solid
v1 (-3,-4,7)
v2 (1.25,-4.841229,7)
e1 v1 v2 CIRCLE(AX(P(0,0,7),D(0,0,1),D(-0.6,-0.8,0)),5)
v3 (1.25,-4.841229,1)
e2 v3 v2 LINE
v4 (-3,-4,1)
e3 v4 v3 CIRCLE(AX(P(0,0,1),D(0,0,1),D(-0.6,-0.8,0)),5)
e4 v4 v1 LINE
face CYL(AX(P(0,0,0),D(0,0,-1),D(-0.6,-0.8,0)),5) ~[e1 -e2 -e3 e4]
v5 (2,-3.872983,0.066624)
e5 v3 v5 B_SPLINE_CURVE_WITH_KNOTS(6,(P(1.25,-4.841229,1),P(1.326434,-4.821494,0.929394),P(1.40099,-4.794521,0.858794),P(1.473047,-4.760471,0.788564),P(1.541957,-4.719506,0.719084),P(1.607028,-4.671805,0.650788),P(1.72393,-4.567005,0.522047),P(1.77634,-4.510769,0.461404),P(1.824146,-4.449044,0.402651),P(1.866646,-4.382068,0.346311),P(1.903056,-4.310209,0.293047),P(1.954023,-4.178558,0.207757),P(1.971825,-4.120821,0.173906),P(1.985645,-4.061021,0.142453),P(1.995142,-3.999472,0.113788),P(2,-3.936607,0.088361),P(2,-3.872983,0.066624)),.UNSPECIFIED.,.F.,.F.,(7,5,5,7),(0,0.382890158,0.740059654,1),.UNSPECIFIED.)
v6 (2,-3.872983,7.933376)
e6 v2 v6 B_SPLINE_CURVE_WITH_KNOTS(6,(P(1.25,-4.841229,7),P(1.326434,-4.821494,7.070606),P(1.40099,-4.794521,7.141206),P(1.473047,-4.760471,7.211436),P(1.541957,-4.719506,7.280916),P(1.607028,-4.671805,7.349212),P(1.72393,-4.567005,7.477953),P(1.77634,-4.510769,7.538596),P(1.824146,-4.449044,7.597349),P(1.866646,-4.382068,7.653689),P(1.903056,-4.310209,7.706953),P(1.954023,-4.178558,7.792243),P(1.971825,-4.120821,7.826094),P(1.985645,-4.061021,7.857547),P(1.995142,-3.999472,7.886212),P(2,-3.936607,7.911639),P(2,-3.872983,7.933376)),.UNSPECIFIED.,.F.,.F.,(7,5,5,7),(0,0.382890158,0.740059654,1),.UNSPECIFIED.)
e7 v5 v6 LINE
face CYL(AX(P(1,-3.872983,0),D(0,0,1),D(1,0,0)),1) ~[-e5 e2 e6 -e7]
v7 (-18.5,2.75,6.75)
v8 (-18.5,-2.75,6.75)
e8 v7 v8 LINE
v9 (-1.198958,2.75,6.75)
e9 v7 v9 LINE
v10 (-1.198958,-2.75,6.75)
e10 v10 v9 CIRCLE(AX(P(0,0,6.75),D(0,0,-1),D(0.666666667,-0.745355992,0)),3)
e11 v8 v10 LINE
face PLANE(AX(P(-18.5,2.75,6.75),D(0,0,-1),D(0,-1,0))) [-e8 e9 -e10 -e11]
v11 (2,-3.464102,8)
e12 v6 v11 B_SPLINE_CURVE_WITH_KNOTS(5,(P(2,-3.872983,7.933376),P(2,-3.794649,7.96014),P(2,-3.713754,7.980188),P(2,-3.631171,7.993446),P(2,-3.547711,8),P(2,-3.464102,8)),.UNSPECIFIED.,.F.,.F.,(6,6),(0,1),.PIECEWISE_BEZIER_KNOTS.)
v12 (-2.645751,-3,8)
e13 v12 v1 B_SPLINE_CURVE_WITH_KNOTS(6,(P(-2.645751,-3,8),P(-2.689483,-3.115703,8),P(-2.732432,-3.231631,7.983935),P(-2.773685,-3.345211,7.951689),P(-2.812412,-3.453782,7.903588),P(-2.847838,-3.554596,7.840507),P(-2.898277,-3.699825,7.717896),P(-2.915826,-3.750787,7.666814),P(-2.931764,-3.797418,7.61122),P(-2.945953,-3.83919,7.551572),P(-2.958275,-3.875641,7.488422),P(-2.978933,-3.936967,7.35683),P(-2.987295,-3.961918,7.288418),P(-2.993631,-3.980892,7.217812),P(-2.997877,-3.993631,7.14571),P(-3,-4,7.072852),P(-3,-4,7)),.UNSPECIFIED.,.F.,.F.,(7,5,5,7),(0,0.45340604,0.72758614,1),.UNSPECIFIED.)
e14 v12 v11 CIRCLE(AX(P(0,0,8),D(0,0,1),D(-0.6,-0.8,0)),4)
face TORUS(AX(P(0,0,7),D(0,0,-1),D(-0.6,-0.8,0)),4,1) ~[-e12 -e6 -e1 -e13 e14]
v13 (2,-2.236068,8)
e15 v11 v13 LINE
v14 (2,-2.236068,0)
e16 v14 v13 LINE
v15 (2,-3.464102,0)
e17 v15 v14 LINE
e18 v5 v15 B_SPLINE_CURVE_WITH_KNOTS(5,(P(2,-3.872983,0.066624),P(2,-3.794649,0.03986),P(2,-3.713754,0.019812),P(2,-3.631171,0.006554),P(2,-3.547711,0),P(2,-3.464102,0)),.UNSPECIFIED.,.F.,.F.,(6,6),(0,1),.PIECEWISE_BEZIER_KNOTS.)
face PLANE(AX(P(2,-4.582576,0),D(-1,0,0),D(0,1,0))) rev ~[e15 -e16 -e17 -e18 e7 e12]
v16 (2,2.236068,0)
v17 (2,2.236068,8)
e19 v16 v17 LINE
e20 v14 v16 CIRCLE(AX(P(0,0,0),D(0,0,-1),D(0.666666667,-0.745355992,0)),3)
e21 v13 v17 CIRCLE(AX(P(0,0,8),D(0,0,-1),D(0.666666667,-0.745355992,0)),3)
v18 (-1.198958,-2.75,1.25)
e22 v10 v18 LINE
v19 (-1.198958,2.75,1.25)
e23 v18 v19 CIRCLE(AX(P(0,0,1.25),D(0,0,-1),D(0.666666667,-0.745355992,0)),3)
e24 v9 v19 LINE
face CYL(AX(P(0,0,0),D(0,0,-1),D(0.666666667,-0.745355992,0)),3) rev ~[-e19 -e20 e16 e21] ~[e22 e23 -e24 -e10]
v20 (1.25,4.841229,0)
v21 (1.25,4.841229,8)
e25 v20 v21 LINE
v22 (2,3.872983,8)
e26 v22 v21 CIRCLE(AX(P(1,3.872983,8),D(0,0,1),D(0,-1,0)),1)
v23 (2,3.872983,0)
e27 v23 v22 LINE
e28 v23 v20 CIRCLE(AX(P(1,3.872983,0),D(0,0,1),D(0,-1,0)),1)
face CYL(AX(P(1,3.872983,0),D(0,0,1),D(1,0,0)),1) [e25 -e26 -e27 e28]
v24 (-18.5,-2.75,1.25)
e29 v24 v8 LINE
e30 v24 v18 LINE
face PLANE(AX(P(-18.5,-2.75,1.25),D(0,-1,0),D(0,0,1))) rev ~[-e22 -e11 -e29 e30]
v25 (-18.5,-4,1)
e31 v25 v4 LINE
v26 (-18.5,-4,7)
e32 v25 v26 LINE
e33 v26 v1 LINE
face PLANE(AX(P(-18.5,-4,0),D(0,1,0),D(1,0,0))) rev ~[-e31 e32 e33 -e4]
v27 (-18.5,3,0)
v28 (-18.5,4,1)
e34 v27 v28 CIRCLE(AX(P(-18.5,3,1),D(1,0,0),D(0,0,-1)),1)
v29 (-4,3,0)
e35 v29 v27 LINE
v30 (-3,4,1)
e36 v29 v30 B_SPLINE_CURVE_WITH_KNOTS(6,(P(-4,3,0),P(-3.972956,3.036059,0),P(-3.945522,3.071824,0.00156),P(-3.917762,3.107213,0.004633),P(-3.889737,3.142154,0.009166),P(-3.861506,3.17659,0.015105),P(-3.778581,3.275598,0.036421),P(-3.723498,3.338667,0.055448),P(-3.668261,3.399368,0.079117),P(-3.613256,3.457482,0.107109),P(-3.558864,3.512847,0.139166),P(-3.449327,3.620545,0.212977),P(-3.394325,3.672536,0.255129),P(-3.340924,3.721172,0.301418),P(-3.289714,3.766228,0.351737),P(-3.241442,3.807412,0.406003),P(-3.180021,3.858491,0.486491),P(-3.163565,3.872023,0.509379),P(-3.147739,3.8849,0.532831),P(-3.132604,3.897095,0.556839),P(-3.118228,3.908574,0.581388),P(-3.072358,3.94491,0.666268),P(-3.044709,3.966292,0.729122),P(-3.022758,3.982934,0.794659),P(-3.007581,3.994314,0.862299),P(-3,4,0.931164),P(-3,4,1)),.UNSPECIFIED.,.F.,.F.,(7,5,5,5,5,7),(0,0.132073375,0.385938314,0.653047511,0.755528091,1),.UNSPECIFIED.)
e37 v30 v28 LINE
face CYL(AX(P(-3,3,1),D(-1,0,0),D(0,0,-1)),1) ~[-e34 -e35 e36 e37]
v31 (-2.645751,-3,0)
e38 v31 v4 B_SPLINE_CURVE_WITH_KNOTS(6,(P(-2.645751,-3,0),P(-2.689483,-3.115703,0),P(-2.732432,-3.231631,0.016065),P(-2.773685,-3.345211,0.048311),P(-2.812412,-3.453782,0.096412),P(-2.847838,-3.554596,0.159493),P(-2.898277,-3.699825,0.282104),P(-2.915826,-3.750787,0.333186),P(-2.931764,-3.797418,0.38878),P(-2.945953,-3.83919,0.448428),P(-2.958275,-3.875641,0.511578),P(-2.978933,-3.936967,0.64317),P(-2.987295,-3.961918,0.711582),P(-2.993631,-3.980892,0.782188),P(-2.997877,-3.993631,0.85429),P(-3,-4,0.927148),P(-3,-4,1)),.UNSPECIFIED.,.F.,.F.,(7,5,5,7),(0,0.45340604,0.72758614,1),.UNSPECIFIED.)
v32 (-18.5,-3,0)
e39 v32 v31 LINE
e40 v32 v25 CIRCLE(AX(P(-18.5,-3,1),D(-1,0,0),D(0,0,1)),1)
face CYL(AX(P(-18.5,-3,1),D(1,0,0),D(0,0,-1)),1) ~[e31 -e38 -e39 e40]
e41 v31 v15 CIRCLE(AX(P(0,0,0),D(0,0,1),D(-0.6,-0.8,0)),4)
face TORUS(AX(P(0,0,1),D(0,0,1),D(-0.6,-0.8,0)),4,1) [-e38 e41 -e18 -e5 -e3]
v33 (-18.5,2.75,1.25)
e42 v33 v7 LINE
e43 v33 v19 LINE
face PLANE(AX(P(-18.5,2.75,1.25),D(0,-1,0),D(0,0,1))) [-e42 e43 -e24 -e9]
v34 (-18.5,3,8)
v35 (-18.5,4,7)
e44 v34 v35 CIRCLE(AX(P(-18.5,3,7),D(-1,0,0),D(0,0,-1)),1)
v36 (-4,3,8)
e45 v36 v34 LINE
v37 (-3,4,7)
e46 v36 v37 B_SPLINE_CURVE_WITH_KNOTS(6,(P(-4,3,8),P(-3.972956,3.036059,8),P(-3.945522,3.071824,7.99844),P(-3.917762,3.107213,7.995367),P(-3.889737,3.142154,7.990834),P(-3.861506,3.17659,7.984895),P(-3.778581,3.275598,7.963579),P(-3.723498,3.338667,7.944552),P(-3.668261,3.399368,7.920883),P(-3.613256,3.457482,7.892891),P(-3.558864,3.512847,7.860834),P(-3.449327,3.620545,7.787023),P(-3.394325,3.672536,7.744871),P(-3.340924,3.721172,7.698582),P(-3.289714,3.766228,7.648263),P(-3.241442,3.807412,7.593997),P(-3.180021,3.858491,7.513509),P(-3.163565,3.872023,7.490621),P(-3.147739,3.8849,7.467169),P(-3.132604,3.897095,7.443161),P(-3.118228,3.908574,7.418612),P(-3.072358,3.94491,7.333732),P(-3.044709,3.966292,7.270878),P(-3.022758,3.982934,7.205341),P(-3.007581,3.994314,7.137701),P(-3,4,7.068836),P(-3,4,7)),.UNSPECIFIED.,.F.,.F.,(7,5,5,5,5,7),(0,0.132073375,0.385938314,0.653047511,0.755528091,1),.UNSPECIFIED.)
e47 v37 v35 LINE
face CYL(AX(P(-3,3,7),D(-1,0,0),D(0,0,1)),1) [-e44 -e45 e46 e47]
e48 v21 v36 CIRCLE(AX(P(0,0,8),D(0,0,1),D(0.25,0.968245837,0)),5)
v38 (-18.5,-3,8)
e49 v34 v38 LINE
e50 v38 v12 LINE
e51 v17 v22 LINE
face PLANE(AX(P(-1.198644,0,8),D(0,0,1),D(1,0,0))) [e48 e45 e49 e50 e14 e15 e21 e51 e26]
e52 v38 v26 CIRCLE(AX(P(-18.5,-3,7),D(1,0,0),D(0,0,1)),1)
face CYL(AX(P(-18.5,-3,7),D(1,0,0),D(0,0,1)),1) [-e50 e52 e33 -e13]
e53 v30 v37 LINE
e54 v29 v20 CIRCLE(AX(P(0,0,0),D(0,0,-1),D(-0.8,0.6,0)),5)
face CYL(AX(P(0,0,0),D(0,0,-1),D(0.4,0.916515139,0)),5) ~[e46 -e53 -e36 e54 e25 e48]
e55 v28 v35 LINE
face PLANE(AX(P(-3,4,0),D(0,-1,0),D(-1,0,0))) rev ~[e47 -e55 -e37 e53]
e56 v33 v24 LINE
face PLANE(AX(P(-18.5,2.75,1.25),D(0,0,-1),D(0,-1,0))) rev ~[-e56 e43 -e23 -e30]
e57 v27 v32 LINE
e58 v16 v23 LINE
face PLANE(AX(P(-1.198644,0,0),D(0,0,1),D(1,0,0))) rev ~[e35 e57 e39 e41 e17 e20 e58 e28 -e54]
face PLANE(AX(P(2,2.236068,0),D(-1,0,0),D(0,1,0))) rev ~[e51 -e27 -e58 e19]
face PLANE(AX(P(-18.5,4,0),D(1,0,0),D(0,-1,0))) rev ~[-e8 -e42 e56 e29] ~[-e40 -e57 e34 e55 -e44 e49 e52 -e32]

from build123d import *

# Parameters (mm, degrees)
F1_DEPTH = 8
F2_W     = 5.5
F2_H     = 5.5
F3_DEPTH = 17.3020421192
F4_R     = 1


# Not quite as in the source:
# - a feature names something its author has since deleted; it is built from what else it names


with BuildPart() as f1:
    # F0 (on Top) → F1 (new body)
    with BuildSketch(Plane.XY):
        with BuildLine():
            ThreePointArc((2, -2.2360679775), (-3, 0), (2, 2.2360679775))
            Line((2, 2.2360679775), (2, 4.582575695))
            ThreePointArc((2, 4.582575695), (-0.5786610494, 4.9664022582), (-3, 4))
            ThreePointArc((-3, 4), (-5, 0), (-3, -4))
            ThreePointArc((-3, -4), (-0.5786610494, -4.9664022582), (2, -4.582575695))
            Line((2, -4.582575695), (2, -2.2360679775))
        make_face()
        with BuildLine():
            ThreePointArc((-3, -4), (-5, 0), (-3, 4))
            Line((-3, 4), (-18.5, 4))
            Line((-18.5, 4), (-18.5, -4))
            Line((-18.5, -4), (-3, -4))
        make_face()
    extrude(amount=F1_DEPTH)

    # F2 (on face) → F3 (cut, through all)
    with BuildSketch(Plane(origin=(-18.5, 0, 0), x_dir=(0, -1, 0), z_dir=(-1, 0, 0))):
        with Locations((0, 4)):
            Rectangle(F2_W, F2_H)
    extrude(amount=-F3_DEPTH, mode=Mode.SUBTRACT)

    # F4
    f4_edges = [f1.edges().sort_by_distance(p)[0] for p in [
        (2, 4.582576, 4),
        (2, -4.582576, 4),
        (-10.75, -4, 0),
        (-10.75, 4, 8),
        (-10.75, 4, 0),
        (-10.75, -4, 8),
        (-0.578661, -4.966402, 8),
        (-0.578661, -4.966402, 0),
    ]]
    fillet(f4_edges, radius=F4_R)


solid = f1.part
